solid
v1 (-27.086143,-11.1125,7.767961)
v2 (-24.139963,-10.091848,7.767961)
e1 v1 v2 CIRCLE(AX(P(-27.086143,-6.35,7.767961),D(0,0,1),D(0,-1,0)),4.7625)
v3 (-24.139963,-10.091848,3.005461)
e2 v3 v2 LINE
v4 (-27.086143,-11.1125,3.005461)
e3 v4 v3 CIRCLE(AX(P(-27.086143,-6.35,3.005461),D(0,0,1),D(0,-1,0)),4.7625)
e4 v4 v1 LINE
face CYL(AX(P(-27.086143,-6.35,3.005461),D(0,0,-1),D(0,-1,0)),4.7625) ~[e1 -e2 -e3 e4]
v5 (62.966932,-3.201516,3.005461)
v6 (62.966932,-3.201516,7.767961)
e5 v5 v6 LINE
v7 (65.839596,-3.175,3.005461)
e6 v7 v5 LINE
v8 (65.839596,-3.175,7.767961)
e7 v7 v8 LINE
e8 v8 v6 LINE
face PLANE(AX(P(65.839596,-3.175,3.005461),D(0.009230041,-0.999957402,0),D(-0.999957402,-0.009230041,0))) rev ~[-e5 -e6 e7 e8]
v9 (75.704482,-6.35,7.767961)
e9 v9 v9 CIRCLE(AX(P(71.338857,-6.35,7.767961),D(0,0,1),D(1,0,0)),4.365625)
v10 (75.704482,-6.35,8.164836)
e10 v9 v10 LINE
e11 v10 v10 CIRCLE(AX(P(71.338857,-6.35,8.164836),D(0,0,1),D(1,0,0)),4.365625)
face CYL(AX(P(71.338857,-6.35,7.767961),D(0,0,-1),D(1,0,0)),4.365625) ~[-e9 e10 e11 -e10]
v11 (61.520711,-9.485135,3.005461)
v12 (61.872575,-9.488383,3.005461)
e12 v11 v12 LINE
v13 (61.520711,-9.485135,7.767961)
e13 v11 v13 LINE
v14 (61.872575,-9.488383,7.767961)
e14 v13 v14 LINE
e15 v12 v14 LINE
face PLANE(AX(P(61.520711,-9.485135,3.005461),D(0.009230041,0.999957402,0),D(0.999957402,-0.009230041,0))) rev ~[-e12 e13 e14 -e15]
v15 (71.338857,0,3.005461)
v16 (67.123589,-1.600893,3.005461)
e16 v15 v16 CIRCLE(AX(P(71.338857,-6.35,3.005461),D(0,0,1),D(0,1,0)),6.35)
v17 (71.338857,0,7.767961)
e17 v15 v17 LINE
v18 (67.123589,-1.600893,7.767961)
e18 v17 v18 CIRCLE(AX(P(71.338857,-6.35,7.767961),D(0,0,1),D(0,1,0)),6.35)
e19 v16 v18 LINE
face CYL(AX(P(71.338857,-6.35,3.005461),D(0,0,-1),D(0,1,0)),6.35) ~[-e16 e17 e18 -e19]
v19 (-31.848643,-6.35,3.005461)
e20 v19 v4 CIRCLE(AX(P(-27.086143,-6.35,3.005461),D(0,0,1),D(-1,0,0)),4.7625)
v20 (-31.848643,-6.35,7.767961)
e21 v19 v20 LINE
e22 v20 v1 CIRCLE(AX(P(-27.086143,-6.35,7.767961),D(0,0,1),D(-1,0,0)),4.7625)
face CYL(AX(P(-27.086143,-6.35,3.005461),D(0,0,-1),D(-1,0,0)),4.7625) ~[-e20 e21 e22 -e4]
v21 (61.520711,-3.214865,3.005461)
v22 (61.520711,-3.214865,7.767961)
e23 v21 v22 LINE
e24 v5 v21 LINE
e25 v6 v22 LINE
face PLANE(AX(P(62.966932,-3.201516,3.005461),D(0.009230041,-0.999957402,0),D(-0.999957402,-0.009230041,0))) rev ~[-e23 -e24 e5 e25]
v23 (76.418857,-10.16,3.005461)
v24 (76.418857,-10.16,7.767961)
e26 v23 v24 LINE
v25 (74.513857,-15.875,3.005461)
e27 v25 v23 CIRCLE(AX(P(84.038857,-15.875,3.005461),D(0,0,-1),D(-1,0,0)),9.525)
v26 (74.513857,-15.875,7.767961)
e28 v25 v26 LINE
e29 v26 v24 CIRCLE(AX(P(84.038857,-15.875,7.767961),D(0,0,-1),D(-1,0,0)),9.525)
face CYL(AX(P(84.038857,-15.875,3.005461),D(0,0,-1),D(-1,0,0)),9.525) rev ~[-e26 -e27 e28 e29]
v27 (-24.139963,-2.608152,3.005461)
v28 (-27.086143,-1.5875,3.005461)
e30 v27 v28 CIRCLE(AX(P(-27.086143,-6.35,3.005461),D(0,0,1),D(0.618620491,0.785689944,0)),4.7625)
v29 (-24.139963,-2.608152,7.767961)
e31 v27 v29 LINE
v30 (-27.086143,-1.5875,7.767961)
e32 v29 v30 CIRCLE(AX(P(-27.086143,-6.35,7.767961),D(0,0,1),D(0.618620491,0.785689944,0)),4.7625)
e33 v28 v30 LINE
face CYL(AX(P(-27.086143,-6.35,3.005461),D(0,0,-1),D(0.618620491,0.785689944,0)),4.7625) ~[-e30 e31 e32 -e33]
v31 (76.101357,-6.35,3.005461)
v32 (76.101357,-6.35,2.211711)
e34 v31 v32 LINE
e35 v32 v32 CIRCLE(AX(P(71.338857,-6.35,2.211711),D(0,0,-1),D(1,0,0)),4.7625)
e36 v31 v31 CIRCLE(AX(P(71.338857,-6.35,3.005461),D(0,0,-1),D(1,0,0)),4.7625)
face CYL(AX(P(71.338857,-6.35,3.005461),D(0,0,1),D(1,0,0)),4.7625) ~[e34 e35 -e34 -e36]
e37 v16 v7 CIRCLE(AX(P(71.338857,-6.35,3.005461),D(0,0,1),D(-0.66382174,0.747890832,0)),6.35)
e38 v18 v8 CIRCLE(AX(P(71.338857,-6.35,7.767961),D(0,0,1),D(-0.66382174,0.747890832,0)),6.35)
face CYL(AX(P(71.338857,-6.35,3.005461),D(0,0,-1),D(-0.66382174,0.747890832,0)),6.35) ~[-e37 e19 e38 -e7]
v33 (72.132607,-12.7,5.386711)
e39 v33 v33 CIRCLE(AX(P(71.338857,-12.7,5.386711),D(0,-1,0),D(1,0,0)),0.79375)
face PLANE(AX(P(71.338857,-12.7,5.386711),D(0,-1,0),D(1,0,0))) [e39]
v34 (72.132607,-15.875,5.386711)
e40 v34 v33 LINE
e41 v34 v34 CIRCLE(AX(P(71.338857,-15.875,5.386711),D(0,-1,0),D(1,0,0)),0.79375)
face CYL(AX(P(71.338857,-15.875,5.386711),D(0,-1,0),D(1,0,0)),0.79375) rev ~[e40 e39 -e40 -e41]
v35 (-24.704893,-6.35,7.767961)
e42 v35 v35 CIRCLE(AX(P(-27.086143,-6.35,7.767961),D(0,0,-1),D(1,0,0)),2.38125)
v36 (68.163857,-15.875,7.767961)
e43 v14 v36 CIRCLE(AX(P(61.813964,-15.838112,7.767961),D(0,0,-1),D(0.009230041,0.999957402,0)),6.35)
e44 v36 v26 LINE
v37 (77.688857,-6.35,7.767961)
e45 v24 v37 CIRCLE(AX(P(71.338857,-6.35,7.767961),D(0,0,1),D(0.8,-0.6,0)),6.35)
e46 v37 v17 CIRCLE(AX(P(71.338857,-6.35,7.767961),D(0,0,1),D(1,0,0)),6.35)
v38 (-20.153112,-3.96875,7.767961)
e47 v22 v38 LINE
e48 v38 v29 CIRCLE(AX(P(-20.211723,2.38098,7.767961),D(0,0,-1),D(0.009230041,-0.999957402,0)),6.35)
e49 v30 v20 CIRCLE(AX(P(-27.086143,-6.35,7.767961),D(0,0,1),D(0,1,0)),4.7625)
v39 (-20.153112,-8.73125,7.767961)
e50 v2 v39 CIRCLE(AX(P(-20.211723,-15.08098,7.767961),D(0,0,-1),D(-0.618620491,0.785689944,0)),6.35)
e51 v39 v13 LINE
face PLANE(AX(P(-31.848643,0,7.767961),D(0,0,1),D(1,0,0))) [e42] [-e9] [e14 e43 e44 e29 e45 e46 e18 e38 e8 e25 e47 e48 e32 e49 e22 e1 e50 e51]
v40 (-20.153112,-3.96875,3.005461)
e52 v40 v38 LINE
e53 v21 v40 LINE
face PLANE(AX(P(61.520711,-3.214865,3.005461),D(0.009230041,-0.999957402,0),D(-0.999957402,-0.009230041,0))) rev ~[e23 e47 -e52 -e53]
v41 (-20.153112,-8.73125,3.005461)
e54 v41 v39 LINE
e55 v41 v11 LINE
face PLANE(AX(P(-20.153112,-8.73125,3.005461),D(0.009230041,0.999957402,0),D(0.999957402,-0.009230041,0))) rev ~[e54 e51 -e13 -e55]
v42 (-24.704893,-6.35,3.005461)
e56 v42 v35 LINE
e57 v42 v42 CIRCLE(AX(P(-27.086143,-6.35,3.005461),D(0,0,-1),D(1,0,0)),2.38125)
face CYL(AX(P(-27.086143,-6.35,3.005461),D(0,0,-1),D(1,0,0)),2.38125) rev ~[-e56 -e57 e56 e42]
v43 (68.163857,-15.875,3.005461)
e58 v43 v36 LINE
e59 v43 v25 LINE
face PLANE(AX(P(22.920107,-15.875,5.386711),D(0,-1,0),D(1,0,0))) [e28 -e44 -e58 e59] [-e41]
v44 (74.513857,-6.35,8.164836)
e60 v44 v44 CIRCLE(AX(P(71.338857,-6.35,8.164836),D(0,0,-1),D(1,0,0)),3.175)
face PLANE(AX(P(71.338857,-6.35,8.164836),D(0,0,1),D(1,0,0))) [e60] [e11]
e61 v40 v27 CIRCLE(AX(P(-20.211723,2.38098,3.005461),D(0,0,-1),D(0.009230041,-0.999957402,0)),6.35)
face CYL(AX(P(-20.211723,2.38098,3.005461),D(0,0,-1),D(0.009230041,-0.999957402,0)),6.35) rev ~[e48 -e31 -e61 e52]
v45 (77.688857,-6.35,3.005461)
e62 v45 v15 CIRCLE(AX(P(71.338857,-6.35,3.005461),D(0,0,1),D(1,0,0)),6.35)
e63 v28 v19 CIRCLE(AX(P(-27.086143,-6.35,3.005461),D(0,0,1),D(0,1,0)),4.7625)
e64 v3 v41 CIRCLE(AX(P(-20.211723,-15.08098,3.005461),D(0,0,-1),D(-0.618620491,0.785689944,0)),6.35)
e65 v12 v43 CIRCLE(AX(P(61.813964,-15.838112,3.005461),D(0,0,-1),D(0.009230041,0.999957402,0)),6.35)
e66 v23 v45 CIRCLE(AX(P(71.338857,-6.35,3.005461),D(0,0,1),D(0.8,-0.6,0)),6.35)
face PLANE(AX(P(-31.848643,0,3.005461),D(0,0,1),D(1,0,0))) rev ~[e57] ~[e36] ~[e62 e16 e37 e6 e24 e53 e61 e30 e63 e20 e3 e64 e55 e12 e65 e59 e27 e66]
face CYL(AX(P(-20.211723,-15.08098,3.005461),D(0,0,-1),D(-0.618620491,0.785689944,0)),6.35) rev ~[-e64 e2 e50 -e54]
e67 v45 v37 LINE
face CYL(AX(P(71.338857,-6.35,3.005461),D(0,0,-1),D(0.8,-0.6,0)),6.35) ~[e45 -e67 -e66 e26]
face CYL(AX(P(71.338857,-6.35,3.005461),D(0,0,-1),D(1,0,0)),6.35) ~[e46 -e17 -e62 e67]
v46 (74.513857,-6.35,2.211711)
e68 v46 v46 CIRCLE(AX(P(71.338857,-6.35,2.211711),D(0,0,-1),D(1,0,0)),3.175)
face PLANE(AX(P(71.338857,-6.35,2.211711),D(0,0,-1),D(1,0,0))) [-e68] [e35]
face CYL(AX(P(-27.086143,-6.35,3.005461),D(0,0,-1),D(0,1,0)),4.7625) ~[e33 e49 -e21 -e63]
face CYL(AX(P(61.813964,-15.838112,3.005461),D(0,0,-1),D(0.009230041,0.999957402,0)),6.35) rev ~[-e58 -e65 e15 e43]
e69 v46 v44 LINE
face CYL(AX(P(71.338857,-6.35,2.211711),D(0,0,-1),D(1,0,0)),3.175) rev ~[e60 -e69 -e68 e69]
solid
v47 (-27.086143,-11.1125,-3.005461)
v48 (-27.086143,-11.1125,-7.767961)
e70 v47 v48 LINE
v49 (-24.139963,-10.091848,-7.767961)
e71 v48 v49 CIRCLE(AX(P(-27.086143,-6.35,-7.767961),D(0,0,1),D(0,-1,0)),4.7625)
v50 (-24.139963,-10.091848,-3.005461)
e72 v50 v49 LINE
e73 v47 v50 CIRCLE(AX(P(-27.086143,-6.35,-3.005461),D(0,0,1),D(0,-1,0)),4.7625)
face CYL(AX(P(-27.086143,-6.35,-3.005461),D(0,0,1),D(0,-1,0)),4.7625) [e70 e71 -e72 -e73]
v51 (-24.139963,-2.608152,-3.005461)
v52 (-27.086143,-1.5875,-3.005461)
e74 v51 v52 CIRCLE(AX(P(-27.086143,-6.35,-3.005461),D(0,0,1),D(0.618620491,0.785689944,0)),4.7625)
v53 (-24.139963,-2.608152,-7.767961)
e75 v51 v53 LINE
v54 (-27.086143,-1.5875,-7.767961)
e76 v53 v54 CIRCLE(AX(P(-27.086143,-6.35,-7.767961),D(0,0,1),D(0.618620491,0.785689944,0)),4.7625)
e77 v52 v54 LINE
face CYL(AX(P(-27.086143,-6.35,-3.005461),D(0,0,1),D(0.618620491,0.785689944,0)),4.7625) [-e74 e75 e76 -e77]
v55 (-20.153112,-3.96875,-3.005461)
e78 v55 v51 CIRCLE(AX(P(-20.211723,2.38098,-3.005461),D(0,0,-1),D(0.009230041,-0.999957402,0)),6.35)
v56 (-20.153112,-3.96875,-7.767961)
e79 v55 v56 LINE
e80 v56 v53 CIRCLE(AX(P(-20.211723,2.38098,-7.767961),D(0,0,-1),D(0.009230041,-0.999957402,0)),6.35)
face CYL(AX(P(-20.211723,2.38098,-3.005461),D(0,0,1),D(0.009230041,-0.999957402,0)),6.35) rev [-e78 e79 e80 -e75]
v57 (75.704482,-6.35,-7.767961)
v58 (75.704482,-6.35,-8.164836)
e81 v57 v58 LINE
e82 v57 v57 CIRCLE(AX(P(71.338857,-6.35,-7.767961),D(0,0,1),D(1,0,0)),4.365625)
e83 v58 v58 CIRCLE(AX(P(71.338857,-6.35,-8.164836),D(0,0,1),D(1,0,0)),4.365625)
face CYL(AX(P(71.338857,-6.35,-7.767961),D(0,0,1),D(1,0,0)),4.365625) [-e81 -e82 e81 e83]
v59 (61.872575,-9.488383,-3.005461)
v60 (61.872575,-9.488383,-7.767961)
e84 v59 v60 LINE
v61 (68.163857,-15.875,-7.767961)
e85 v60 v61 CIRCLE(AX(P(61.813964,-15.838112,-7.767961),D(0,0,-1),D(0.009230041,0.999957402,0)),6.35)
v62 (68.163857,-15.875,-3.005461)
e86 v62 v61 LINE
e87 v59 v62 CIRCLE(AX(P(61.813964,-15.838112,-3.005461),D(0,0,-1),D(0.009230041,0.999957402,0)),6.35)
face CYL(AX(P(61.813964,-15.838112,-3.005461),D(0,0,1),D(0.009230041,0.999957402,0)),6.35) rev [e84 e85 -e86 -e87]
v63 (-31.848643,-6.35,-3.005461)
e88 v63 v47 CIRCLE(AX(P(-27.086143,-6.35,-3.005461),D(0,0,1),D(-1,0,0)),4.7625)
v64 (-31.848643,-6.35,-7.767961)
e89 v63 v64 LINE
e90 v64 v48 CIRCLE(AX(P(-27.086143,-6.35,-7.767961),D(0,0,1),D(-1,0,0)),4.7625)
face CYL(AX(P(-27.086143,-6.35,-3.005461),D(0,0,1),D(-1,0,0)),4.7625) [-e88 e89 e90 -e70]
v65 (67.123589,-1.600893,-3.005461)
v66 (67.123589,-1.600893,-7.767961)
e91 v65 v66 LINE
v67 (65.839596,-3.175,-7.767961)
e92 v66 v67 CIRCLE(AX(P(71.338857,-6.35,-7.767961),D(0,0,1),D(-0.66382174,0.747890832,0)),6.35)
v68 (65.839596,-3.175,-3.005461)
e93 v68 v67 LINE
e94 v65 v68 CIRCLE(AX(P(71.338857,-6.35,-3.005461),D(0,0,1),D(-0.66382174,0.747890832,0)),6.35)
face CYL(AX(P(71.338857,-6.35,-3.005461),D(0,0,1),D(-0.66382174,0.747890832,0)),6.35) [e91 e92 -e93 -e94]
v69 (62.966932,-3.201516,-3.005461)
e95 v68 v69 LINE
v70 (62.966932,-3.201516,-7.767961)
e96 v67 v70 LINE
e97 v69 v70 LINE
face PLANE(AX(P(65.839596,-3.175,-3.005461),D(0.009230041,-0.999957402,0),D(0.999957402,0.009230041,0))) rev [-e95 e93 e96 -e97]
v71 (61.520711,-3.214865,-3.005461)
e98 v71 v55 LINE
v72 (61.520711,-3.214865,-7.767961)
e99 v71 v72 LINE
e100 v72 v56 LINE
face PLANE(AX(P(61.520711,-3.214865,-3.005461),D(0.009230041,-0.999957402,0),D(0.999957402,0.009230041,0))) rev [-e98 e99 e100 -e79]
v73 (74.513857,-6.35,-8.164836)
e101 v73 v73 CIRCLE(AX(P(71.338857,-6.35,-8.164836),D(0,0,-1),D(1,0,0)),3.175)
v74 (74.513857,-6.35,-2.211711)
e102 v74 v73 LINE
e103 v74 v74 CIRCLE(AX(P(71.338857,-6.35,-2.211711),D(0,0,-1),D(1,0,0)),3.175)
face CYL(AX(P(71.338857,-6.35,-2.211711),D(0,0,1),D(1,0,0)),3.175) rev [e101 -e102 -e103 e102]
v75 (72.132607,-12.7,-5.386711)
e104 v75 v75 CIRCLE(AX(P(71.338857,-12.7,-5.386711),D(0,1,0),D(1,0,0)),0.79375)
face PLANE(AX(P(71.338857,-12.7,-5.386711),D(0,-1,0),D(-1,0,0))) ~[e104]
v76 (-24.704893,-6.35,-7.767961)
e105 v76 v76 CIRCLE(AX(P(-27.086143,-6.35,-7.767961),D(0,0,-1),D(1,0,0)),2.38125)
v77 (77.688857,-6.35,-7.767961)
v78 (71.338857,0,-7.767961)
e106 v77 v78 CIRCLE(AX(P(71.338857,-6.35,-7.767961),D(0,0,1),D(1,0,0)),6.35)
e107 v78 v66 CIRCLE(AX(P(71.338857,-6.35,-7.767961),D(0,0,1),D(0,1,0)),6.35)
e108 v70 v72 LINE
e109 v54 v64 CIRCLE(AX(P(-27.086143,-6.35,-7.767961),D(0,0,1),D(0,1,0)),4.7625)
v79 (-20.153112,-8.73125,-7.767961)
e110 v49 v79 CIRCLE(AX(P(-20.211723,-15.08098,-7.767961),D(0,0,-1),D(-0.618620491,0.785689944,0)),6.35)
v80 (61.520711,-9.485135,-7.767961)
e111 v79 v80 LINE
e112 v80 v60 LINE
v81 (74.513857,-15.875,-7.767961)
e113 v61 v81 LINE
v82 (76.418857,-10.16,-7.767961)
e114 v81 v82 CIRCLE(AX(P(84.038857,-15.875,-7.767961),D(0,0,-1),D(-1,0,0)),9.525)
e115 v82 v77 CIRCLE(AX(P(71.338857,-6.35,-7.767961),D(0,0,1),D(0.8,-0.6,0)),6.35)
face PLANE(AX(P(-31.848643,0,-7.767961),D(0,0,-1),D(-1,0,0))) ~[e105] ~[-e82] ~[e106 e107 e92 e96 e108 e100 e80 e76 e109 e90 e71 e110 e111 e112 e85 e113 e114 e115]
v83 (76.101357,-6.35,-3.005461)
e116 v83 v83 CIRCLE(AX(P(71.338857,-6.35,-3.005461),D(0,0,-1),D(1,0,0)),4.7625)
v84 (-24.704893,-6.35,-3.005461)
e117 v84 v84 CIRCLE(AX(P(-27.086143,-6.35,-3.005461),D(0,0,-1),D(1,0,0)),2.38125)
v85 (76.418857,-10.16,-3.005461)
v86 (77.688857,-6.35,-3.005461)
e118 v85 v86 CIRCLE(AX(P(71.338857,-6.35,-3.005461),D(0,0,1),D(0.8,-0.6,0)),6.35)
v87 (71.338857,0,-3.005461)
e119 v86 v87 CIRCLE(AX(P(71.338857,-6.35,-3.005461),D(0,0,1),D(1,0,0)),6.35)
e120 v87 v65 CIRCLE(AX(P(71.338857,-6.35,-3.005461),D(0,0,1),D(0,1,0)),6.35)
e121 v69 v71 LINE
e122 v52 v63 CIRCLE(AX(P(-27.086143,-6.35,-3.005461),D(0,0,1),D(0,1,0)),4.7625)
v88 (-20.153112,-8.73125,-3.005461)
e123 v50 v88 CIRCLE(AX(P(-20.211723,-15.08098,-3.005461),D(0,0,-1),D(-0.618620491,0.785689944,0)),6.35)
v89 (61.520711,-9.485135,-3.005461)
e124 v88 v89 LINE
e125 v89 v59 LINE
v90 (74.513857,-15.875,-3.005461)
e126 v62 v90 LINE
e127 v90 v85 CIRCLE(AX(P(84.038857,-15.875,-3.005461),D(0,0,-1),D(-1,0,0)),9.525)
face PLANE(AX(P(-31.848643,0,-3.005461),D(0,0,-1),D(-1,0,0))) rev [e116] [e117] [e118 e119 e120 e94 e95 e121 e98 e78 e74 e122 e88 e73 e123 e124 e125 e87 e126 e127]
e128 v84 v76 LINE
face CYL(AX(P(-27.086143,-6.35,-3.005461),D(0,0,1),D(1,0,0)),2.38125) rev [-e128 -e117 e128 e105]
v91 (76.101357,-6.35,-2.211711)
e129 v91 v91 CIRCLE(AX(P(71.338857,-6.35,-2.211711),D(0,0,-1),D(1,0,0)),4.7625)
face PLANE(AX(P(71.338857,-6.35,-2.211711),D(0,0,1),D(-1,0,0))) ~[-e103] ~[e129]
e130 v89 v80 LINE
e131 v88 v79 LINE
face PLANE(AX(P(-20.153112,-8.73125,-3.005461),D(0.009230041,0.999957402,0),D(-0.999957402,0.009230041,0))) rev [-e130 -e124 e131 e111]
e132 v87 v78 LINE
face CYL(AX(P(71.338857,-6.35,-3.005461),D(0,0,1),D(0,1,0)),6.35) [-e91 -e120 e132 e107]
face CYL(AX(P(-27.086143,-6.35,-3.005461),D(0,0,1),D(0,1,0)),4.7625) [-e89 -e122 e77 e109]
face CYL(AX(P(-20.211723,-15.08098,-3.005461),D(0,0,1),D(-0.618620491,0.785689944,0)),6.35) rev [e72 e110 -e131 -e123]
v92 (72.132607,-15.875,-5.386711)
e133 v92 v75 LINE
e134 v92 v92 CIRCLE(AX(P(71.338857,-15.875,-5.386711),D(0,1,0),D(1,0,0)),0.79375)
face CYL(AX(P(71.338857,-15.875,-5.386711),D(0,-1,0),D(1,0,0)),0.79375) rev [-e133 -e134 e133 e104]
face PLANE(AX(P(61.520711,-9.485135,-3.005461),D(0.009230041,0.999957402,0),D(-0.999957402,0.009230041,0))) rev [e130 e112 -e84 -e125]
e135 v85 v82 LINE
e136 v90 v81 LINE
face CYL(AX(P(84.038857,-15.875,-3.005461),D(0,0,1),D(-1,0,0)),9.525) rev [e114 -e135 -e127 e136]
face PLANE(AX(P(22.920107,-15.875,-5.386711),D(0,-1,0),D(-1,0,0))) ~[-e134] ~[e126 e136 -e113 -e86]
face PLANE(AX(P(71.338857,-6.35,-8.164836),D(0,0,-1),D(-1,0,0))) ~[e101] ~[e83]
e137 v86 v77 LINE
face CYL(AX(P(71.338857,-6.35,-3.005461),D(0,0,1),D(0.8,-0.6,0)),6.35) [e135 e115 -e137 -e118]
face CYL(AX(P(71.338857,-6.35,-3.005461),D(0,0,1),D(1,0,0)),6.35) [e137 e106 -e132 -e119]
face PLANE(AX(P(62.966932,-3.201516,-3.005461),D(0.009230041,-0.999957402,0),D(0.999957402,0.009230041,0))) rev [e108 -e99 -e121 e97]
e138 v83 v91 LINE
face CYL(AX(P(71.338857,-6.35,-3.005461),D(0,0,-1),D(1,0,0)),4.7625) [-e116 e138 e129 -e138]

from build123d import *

# Parameters (mm, degrees)
F0_W      = 109.5375
F0_H      = 4.7625
F1_DEPTH  = 15.875
F3_DEPTH  = 4.7625
F4_R      = 2.38125
F5_DEPTH  = 4.7625
F6_R      = 4.7625
F7_DEPTH  = 0.79375
F8_R      = 4.365625
F9_DEPTH  = 0.396875
F10_R     = 3.175
F11_DEPTH = 6.35
F12_R     = 0.79375
F13_DEPTH = 3.175


# Not quite as in the source:
# - a length typed as a fraction of an inch, garbled in the dataset ("3 / 203.2 mm" for 3/8 in), is restored


with BuildPart() as f1:
    # F0 (on Front) → F1 (new body)
    with BuildSketch(Plane.XZ):
        with Locations((22.9201070249, 5.3867108949)):
            Rectangle(F0_W, F0_H)
    extrude(amount=F1_DEPTH)

    # F2 (on face) → F3 (cut)
    with BuildSketch(Plane(origin=(0, 0, 3.0054608949), x_dir=(1, 0, 0), z_dir=(0, 0, -1))):
        with BuildLine():
            ThreePointArc((67.1235889731, 1.6008932155), (66.4182398642, 2.3362702187), (65.8395957109, 3.175))
            Line((65.8395957109, 3.175), (62.9669316793, 3.2015159353))
            ThreePointArc((62.9669316793, 3.2015159353), (65.190207924, 2.7776190059), (67.1235889731, 1.6008932155))
        make_face()
        with BuildLine():
            Line((68.1638570249, 15.875), (-27.0861429751, 15.875))
            Line((-27.0861429751, 15.875), (-27.0861429751, 11.1125))
            ThreePointArc((-27.0861429751, 11.1125), (-25.5271603838, 10.8501088353), (-24.1399628876, 10.091848359))
            ThreePointArc((-24.1399628876, 10.091848359), (-22.262653003, 9.0713052051), (-20.1531120128, 8.73125))
            Line((-20.1531120128, 8.73125), (61.5207105875, 9.4851348166))
            Line((61.5207105875, 9.4851348166), (61.8725749266, 9.4883826771))
            ThreePointArc((61.8725749266, 9.4883826771), (66.3377291769, 11.3818749629), (68.1638570249, 15.875))
        make_face()
        with BuildLine():
            ThreePointArc((-24.1399628876, 2.608151641), (-25.5271603838, 1.8498911647), (-27.0861429751, 1.5875))
            Line((-27.0861429751, 1.5875), (-27.0861429751, 0))
            Line((-27.0861429751, 0), (71.3388570249, 0))
            ThreePointArc((71.3388570249, 0), (69.0843424521, 0.4136994651), (67.1235889731, 1.6008932155))
            ThreePointArc((67.1235889731, 1.6008932155), (65.190207924, 2.7776190059), (62.9669316793, 3.2015159353))
            Line((62.9669316793, 3.2015159353), (61.5207105875, 3.2148651834))
            Line((61.5207105875, 3.2148651834), (-20.1531120128, 3.96875))
            ThreePointArc((-20.1531120128, 3.96875), (-22.262653003, 3.6286947949), (-24.1399628876, 2.608151641))
        make_face()
        with BuildLine():
            Line((-27.0861429751, 11.1125), (-27.0861429751, 15.875))
            Line((-27.0861429751, 15.875), (-31.8486429751, 15.875))
            Line((-31.8486429751, 15.875), (-31.8486429751, 6.35))
            ThreePointArc((-31.8486429751, 6.35), (-30.4537390205, 9.7175960454), (-27.0861429751, 11.1125))
        make_face()
        with BuildLine():
            ThreePointArc((-27.0861429751, 1.5875), (-30.4537390205, 2.9824039546), (-31.8486429751, 6.35))
            Line((-31.8486429751, 6.35), (-31.8486429751, 0))
            Line((-31.8486429751, 0), (-27.0861429751, 0))
            Line((-27.0861429751, 0), (-27.0861429751, 1.5875))
        make_face()
        with BuildLine():
            Line((77.6888570249, 15.875), (74.5138570249, 15.875))
            ThreePointArc((74.5138570249, 15.875), (75.002648611, 12.8629305287), (76.4188570249, 10.16))
            ThreePointArc((76.4188570249, 10.16), (77.3629959675, 8.3580463142), (77.6888570249, 6.35))
            Line((77.6888570249, 6.35), (77.6888570249, 15.875))
        make_face()
        with BuildLine():
            ThreePointArc((77.6888570249, 6.35), (75.8289850854, 1.8598719395), (71.3388570249, 0))
            Line((71.3388570249, 0), (77.6888570249, 0))
            Line((77.6888570249, 0), (77.6888570249, 6.35))
        make_face()
    extrude(amount=-F3_DEPTH, mode=Mode.SUBTRACT)

    # F4 (on face) → F5 (cut)
    with BuildSketch(Plane(origin=(0, 0, 3.0054608949), x_dir=(1, 0, 0), z_dir=(0, 0, -1))):
        with Locations((-27.0861429751, 6.35)):
            Circle(F4_R)
    extrude(amount=-F5_DEPTH, mode=Mode.SUBTRACT)

    # F6 (on face) → F7 (join)
    with BuildSketch(Plane(origin=(0, 0, 3.0054608949), x_dir=(1, 0, 0), z_dir=(0, 0, -1))):
        with Locations((71.3388570249, 6.35)):
            Circle(F6_R)
    extrude(amount=F7_DEPTH)

    # F8 (on face) → F9 (join)
    with BuildSketch(Plane.XY.offset(7.7679608949)):
        with Locations((71.3388570249, -6.35)):
            Circle(F8_R)
    extrude(amount=F9_DEPTH)

    # F10 (on face) → F11 (cut)
    with BuildSketch(Plane(origin=(0, 0, 2.2117108949), x_dir=(1, 0, 0), z_dir=(0, 0, -1))):
        with Locations((71.3388570249, 6.35)):
            Circle(F10_R)
    extrude(amount=-F11_DEPTH, mode=Mode.SUBTRACT)

    # F12 (on face) → F13 (cut)
    with BuildSketch(Plane.XZ.offset(15.875)):
        with Locations((71.3388570249, 5.3867108949)):
            Circle(F12_R)
    extrude(amount=-F13_DEPTH, mode=Mode.SUBTRACT)


with BuildPart() as f15_1:
    # F15: instance of F1
    add(f1.part.mirror(Plane.XY))


solid = Compound([f1.part, f15_1.part])
